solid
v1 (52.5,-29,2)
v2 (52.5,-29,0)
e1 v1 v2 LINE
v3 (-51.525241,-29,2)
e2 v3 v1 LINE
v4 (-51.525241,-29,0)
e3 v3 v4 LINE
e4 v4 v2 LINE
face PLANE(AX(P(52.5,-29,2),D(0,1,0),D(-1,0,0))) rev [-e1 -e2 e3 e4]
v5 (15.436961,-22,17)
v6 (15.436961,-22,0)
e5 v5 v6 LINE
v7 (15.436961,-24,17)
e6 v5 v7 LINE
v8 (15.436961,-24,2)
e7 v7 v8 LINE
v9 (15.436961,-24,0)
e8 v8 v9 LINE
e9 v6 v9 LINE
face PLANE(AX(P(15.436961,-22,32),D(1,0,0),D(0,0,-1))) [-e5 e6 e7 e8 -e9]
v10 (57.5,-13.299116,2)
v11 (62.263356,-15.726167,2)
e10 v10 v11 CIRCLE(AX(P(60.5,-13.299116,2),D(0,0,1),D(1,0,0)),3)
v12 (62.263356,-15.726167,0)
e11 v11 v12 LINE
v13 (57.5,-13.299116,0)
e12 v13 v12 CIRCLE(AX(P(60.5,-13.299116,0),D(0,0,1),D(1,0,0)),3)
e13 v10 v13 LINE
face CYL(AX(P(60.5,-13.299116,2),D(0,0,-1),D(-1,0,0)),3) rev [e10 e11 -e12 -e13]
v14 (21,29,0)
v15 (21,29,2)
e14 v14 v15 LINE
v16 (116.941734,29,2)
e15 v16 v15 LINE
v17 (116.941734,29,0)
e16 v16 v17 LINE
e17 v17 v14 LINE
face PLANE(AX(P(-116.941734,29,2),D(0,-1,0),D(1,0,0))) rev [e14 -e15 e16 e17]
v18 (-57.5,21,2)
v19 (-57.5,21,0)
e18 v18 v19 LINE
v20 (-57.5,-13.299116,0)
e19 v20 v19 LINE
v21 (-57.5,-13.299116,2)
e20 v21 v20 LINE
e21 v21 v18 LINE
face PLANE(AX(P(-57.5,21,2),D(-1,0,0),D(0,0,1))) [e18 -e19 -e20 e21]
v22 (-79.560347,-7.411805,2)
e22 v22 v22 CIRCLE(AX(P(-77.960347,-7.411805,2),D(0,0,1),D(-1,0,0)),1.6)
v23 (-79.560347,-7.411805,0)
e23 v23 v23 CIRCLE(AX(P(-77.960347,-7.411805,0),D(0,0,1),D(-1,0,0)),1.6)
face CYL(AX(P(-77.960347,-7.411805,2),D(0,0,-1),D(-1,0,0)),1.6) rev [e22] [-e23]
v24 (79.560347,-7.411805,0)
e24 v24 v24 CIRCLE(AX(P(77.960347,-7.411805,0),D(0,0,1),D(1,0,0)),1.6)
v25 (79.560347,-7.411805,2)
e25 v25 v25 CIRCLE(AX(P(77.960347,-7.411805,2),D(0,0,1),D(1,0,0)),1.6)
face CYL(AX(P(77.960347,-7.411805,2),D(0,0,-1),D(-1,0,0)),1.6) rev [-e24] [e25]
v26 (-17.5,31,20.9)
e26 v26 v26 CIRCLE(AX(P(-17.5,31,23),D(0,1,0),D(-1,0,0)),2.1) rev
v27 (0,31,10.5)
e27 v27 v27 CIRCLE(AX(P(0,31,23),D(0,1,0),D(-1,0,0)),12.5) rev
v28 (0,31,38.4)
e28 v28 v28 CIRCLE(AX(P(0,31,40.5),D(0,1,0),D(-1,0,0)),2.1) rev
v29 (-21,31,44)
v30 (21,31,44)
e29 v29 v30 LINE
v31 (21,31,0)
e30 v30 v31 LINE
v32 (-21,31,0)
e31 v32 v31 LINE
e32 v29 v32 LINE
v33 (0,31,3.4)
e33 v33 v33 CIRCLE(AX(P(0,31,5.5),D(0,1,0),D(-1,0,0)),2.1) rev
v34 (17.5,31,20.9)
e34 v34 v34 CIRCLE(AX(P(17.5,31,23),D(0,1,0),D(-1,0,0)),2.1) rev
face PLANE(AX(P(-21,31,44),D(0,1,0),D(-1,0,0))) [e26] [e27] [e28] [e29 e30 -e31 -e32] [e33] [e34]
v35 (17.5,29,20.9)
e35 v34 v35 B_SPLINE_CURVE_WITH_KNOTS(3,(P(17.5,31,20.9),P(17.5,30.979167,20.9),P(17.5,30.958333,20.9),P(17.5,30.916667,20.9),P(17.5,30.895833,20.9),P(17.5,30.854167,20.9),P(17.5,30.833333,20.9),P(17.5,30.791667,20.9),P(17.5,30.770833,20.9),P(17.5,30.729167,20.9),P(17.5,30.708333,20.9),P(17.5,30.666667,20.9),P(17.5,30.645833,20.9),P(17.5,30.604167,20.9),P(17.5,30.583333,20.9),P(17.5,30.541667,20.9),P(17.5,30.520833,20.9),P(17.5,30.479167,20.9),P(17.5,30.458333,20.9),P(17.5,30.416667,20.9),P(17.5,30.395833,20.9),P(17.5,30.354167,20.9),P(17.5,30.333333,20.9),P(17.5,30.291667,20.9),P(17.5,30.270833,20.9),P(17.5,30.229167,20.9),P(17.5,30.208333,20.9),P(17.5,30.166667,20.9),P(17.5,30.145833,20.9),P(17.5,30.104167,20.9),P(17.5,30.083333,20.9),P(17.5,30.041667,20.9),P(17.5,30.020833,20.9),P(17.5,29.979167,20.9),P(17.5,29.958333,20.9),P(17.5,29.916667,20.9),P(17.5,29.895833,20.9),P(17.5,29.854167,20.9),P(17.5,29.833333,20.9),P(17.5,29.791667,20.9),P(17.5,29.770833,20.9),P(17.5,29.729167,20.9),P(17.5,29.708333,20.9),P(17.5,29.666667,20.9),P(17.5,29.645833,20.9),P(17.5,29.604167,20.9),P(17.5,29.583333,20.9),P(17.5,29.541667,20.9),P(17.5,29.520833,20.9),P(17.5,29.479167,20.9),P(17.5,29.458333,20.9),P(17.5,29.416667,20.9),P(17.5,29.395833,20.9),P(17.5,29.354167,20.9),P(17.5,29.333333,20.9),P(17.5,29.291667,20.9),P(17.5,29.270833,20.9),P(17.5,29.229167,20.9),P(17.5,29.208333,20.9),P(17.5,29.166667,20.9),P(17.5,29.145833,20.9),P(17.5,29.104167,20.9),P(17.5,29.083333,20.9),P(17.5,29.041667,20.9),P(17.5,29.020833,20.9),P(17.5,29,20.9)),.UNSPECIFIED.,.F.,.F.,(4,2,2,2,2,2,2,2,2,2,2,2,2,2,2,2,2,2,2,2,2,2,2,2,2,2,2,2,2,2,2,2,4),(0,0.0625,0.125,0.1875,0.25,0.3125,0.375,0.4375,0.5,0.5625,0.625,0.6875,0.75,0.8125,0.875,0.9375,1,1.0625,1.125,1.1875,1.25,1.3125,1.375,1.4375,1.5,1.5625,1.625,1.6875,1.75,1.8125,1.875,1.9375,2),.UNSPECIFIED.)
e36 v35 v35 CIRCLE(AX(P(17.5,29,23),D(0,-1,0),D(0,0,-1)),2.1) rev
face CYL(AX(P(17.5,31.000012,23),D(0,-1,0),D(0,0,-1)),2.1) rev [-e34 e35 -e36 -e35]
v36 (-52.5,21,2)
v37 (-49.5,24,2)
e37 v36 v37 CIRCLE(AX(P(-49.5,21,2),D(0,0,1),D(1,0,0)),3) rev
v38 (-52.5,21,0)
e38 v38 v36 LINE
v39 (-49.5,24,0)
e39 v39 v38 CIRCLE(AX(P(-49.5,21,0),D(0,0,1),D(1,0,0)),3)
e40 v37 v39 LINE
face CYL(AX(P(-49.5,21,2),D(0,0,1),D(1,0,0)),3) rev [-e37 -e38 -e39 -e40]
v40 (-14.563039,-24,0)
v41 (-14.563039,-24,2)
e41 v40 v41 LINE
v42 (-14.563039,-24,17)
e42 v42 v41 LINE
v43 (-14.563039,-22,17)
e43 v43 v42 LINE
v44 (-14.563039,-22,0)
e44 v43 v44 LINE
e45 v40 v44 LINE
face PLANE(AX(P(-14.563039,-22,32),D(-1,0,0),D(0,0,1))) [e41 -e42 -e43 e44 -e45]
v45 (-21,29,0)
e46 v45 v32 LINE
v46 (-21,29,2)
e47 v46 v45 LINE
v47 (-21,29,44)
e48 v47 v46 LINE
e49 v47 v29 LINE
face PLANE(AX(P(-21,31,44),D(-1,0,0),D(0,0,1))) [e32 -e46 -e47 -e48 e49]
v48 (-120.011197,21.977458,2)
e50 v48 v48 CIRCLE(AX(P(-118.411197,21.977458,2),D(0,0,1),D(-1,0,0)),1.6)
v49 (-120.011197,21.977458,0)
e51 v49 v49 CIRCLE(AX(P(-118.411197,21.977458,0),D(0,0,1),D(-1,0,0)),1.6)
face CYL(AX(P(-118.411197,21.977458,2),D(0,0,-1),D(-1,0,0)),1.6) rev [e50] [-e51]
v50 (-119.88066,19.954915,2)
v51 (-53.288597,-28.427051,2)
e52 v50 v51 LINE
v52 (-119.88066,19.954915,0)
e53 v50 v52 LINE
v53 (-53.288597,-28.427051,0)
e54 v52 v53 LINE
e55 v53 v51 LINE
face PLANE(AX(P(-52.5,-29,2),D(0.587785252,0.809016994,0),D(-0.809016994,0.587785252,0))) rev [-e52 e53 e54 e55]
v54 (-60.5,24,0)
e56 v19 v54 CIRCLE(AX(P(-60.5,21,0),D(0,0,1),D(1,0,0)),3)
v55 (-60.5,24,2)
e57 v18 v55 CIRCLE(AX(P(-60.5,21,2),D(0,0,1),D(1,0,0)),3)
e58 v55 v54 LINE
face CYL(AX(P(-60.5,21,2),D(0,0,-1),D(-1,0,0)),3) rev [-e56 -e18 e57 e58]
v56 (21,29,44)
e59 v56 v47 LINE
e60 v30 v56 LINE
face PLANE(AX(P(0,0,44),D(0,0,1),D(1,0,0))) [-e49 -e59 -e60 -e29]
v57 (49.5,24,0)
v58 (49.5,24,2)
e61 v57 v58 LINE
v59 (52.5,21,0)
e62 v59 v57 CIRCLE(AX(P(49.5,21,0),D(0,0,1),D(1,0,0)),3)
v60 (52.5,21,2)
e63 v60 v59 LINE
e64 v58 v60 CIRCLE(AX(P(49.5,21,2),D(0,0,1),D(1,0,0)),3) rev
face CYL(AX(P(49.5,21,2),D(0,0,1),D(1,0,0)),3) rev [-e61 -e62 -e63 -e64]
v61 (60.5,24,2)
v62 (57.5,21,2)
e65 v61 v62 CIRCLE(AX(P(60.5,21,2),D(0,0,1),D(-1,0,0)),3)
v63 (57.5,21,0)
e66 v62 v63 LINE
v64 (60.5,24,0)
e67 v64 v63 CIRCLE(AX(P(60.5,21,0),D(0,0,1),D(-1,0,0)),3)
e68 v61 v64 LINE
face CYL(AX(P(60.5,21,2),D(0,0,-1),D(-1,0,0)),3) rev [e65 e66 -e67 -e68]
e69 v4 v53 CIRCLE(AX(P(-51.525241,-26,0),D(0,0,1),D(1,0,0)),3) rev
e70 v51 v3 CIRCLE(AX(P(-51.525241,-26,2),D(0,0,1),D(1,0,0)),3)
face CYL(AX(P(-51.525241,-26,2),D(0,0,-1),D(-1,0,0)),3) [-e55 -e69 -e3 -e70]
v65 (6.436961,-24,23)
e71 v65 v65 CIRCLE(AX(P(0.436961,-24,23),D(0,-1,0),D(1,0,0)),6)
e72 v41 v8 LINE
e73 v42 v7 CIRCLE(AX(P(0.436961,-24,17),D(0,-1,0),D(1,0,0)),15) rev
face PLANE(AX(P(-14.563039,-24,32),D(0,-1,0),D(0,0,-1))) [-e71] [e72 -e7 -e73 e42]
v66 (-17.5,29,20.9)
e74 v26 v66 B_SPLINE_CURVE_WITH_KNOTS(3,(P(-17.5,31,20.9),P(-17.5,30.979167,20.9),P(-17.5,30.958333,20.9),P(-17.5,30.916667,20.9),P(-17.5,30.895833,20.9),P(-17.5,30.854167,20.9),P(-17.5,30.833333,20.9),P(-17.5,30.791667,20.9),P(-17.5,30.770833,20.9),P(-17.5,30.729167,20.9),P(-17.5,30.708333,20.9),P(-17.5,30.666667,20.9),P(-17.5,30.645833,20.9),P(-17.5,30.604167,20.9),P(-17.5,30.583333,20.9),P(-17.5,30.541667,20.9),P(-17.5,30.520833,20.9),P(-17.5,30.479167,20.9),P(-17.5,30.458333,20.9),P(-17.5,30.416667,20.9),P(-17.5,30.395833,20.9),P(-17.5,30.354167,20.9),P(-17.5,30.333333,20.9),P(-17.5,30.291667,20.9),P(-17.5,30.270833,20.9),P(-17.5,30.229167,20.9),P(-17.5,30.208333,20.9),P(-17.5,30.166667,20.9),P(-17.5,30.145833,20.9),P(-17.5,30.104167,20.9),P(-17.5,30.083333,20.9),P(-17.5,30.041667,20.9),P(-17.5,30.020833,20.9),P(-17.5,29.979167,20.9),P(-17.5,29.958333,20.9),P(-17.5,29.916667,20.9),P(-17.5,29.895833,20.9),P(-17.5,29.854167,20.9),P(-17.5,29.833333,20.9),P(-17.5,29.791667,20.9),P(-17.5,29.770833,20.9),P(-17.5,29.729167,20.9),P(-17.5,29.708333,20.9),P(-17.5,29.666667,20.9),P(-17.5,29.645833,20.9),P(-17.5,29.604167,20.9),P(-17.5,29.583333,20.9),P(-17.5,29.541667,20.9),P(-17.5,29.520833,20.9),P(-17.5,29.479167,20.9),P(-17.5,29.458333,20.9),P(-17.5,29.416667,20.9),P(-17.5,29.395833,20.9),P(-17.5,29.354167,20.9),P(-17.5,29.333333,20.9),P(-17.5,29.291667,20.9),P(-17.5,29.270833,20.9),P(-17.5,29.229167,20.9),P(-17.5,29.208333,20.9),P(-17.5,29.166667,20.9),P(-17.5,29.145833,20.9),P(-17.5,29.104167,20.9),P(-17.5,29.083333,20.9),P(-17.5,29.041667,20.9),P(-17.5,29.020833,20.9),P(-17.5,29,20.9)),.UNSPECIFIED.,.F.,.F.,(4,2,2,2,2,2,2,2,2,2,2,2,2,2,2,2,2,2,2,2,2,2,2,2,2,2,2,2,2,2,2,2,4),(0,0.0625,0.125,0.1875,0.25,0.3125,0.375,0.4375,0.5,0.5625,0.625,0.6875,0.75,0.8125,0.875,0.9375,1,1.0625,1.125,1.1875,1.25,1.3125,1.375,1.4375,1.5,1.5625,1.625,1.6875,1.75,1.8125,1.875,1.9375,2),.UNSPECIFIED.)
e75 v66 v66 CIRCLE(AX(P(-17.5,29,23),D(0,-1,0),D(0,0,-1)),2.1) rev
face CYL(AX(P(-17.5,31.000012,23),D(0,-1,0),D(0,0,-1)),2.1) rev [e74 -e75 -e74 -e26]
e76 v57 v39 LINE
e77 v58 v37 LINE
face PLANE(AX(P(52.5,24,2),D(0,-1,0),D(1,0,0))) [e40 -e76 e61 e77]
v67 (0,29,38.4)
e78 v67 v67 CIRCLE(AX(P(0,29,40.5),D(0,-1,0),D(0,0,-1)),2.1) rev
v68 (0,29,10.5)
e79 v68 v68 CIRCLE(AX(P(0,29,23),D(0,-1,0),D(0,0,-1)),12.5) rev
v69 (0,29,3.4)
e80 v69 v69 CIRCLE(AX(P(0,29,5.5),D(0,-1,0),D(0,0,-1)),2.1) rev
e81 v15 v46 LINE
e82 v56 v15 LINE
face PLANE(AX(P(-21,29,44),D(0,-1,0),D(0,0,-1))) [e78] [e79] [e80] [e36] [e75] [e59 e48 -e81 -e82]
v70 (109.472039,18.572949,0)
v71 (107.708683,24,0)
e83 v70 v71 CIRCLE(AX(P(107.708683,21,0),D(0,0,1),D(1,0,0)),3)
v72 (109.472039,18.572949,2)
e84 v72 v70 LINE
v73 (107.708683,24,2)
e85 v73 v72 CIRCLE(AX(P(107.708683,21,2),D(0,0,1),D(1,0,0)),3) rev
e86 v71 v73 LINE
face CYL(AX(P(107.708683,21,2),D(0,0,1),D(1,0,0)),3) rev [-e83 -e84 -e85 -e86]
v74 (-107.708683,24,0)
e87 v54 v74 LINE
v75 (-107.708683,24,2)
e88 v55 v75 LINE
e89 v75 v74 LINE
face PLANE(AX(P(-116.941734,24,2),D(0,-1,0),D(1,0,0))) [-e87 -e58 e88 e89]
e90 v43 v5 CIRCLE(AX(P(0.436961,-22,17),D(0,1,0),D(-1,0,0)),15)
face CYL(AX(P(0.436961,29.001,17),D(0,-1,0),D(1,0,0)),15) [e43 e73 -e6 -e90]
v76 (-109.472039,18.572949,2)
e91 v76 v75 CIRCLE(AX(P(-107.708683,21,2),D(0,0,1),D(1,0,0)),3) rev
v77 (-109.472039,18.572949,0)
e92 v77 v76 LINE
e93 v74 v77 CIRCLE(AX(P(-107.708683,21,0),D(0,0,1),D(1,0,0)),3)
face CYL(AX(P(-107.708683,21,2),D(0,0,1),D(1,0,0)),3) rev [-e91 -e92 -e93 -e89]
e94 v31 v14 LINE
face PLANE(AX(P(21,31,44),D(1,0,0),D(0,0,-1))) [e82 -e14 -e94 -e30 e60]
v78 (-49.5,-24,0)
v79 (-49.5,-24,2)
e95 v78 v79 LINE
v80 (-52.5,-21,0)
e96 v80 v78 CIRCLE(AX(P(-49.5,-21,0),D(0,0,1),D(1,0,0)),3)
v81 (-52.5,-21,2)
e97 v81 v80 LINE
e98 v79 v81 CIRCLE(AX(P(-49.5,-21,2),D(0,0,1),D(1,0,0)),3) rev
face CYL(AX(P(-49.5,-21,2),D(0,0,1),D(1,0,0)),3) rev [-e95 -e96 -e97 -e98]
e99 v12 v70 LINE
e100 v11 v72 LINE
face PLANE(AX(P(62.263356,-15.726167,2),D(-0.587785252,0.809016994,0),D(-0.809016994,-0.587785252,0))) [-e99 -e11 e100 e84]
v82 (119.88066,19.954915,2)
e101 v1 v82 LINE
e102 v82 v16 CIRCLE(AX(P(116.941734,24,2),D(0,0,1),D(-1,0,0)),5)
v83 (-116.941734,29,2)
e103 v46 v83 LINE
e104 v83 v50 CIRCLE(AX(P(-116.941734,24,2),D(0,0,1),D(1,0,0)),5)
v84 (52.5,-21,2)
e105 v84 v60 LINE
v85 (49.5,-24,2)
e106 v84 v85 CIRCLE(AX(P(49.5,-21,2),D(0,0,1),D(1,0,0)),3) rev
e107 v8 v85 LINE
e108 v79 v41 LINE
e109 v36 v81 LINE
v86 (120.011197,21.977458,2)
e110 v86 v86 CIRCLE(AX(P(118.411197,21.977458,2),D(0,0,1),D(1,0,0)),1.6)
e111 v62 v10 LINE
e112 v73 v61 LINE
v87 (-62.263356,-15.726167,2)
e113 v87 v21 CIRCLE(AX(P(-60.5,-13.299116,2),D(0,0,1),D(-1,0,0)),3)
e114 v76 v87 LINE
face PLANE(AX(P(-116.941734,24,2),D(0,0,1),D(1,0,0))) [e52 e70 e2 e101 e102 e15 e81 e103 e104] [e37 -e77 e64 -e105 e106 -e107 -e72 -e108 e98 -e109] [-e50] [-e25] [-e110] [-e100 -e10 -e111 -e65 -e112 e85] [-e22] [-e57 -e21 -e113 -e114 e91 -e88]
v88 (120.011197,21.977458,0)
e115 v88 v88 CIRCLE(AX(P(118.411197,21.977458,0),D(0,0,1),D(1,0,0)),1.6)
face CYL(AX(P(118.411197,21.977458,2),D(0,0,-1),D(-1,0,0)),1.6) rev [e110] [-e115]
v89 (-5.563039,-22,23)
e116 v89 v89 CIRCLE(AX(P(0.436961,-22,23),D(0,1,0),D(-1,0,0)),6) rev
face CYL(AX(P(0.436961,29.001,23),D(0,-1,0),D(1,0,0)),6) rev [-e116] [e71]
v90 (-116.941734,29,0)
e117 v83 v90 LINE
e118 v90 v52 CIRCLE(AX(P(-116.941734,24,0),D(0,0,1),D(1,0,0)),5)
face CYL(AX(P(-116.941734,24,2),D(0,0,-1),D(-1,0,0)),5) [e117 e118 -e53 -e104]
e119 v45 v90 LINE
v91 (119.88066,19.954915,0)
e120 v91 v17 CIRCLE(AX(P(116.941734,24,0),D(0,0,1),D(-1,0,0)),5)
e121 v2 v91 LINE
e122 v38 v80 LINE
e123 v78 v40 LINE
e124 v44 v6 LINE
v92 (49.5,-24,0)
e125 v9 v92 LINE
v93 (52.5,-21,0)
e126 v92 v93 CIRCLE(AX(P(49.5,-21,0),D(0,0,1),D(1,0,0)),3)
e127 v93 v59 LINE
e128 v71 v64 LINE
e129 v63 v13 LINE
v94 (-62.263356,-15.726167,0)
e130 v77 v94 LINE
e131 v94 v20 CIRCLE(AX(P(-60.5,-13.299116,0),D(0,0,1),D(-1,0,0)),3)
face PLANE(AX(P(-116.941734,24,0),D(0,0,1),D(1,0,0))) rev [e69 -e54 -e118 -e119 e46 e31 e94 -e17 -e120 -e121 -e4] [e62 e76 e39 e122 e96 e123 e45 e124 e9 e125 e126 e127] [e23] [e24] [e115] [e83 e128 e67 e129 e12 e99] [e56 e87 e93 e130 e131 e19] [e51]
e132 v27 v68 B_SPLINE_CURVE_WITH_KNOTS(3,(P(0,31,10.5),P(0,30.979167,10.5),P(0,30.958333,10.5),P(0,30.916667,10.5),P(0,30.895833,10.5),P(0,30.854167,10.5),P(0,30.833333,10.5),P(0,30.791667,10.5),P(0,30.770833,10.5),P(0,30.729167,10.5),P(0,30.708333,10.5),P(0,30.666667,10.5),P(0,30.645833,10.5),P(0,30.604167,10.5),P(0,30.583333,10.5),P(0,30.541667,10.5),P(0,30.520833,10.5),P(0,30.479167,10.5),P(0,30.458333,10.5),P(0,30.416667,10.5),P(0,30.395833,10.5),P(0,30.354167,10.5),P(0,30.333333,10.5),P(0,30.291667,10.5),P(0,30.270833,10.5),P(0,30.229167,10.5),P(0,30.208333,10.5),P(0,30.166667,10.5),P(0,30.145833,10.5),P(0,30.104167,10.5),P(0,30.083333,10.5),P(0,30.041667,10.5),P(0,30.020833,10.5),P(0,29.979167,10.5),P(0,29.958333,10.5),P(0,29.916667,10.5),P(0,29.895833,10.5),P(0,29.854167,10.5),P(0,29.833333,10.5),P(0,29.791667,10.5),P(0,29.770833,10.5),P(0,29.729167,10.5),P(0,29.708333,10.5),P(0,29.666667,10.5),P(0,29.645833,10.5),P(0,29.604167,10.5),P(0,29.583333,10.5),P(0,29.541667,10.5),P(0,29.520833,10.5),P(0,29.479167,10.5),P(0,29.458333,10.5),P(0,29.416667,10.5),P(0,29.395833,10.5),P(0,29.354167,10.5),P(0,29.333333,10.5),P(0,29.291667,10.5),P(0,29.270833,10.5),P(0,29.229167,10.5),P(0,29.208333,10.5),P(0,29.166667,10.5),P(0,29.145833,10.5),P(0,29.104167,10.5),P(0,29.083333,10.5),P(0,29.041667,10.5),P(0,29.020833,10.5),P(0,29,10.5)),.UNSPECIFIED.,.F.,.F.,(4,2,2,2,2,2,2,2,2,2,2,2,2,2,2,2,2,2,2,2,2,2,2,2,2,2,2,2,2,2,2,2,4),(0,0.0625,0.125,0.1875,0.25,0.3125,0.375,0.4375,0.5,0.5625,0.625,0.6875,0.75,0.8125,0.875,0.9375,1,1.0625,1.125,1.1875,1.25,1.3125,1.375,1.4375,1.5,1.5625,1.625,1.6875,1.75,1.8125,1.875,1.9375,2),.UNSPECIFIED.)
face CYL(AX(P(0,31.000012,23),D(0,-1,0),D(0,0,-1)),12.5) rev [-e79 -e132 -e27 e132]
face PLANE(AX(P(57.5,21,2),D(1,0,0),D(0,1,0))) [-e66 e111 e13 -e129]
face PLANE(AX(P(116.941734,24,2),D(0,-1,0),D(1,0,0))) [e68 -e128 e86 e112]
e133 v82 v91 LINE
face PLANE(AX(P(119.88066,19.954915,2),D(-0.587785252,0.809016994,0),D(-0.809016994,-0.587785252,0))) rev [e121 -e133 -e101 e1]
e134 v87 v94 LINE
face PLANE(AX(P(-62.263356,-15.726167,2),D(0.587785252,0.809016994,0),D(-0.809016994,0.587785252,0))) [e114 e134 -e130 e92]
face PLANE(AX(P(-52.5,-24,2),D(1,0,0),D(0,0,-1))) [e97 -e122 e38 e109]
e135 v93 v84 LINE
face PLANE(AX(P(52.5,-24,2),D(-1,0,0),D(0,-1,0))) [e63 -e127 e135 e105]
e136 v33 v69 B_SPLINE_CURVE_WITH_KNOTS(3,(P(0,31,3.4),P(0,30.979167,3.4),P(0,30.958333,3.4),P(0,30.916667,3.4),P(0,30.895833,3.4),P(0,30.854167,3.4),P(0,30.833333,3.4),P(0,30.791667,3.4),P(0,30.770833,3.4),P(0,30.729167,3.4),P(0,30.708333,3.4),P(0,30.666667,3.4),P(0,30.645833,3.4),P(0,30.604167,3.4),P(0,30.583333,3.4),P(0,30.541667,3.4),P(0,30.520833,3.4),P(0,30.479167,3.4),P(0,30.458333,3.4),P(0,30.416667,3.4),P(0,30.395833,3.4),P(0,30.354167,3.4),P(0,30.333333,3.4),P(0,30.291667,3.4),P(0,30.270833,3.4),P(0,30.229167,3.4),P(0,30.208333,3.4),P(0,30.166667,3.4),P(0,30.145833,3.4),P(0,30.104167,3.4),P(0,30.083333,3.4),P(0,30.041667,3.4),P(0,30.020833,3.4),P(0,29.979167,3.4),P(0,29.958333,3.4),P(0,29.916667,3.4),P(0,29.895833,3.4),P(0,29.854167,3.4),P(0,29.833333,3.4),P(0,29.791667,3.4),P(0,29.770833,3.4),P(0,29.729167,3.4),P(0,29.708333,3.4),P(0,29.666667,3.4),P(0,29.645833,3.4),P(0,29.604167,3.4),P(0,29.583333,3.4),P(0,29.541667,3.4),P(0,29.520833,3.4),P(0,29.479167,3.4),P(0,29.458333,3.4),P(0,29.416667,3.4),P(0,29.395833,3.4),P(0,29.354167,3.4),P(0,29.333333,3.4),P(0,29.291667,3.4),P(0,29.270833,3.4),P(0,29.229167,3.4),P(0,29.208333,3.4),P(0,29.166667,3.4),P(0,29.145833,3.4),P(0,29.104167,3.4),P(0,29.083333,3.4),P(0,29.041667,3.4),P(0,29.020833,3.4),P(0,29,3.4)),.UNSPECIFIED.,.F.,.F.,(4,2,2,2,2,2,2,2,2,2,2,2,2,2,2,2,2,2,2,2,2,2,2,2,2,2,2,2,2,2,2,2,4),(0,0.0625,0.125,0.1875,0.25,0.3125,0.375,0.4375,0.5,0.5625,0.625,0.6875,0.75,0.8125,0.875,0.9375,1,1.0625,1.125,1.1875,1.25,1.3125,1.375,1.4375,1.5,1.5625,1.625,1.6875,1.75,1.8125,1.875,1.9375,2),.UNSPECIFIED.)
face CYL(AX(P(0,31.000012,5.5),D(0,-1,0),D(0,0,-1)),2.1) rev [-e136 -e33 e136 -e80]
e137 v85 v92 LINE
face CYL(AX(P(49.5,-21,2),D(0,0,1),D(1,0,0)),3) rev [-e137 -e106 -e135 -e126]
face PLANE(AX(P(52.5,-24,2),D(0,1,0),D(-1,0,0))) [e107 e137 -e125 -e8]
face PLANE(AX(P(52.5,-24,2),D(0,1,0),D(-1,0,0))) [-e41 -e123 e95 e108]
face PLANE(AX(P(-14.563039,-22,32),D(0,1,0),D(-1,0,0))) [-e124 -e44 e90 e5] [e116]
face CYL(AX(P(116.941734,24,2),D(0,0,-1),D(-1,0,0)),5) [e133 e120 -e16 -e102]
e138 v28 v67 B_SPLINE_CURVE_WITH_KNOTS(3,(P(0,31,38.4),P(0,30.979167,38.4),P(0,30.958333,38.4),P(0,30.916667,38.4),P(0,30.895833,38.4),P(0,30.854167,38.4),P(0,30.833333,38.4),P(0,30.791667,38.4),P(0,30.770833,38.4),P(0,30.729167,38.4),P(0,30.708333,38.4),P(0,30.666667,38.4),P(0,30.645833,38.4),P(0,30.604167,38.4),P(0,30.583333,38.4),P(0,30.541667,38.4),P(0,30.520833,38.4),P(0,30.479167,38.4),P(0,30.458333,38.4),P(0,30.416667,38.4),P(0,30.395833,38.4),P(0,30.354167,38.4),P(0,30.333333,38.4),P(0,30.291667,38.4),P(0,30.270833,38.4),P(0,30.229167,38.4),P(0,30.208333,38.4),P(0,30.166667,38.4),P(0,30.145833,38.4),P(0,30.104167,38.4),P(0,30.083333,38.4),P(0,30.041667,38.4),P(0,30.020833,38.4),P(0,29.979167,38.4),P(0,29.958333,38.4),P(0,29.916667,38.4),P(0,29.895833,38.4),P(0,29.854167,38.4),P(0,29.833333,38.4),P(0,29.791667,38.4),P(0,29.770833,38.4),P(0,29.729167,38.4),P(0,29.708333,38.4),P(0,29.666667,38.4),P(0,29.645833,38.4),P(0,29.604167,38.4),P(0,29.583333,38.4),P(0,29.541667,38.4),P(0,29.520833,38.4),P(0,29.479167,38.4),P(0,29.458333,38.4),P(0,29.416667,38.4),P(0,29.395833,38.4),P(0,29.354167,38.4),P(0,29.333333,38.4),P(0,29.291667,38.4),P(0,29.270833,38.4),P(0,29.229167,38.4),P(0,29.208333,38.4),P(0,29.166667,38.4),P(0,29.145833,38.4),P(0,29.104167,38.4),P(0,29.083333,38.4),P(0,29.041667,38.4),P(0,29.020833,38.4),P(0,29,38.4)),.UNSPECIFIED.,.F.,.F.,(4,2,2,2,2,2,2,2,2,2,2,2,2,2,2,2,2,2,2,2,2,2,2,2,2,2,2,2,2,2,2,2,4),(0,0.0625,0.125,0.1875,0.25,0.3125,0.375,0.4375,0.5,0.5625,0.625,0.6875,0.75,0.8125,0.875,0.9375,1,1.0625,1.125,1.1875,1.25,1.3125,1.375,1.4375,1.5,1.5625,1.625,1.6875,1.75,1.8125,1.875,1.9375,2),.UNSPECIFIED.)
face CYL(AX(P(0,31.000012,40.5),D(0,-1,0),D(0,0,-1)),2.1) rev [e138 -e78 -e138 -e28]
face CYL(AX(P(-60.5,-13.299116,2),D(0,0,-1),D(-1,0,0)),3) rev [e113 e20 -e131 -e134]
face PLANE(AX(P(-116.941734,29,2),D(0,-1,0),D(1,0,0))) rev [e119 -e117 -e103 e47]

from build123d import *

# Parameters (mm, degrees)
SKETCH_1_R                      = 1.6
SKETCH_1_W                      = 105
SKETCH_1_H                      = 48
EXTRUDE_1_DEPTH                 = 2
FILLET_1_R                      = 3
SKETCH_2_W                      = 30
SKETCH_2_H                      = 2
EXTRUDE_2_DEPTH                 = 32
CUT_EXTRUDE_START               = -2
CUT_EXTRUDE_1_OUTLINE_R         = 6
CUT_EXTRUDE_1_DEPTH             = 2
SKETCH_4_W                      = 42
SKETCH_4_H                      = 2
EXTRUDE_3_DEPTH                 = 44
CUT_EXTRUDE_2_REACH             = 144.849
SKETCH_5_R                      = 2.1
SKETCH_5_R_2                    = 12.5
CUT_EXTRUDE_2_DIRECTION_2_DEPTH = 143.84882365


# Read off the part's stored shape, not the designer's step: ｶｯﾄ - 押し出し1
with BuildPart() as part:
    # ｽｹｯﾁ1 → ﾎﾞｽ - 押し出し1 (new body)
    with BuildSketch(Plane.XY):
        with BuildLine():
            Line((-116.941733701, 29), (116.941733701, 29))
            ThreePointArc((116.941733701, 29), (121.697016283, 25.545084972), (119.880659963, 19.954915028))
            Line((119.880659963, 19.954915028), (52.5, -29))
            Line((52.5, -29), (-52.5, -29))
            Line((-52.5, -29), (-119.880659963, 19.954915028))
            ThreePointArc((-119.880659963, 19.954915028), (-121.697016283, 25.545084972), (-116.941733701, 29))
        make_face()
        with Locations((118.411196832, 21.977457514)):
            Circle(SKETCH_1_R, mode=Mode.SUBTRACT)
        with Locations((77.960347113, -7.411805101)):
            Circle(SKETCH_1_R, mode=Mode.SUBTRACT)
        with Locations(Location((-118.411196832, 21.977457514, 0), (0, 0, 180))):
            Circle(SKETCH_1_R, mode=Mode.SUBTRACT)
        with Locations(Location((-77.960347113, -7.411805101, 0), (0, 0, 180))):
            Circle(SKETCH_1_R, mode=Mode.SUBTRACT)
        Rectangle(SKETCH_1_W, SKETCH_1_H, mode=Mode.SUBTRACT)
        with BuildLine():
            Line((-57.5, 21), (-57.5, -13.299115956))
            ThreePointArc((-57.5, -13.299115956), (-59.138028501, -15.972135529), (-62.263355757, -15.726166939))
            Line((-62.263355757, -15.726166939), (-116.941733701, 24))
            Line((-116.941733701, 24), (-60.5, 24))
            ThreePointArc((-60.5, 24), (-58.378679656, 23.121320344), (-57.5, 21))
        make_face(mode=Mode.SUBTRACT)
        with BuildLine():
            Line((62.263355757, -15.726166939), (116.941733701, 24))
            Line((116.941733701, 24), (60.5, 24))
            ThreePointArc((60.5, 24), (58.378679656, 23.121320344), (57.5, 21))
            Line((57.5, 21), (57.5, -13.299115956))
            ThreePointArc((57.5, -13.299115956), (59.138028501, -15.972135529), (62.263355757, -15.726166939))
        make_face(mode=Mode.SUBTRACT)
    extrude(amount=EXTRUDE_1_DEPTH)

    # ﾌｨﾚｯﾄ1
    fillet_1_edges = [part.edges().sort_by_distance(p)[0] for p in [
        (-52.5, -29, 1),
        (-52.5, 24, 1),
        (-52.5, -24, 1),
        (52.5, -24, 1),
        (52.5, 24, 1),
        (116.941733701, 24, 1),
        (-116.941733701, 24, 1),
    ]]
    fillet(fillet_1_edges, radius=FILLET_1_R)

    # ｽｹｯﾁ2 → ﾎﾞｽ - 押し出し2 (add)
    with BuildSketch(Plane(origin=(0, 0, 0), x_dir=(-1, 0, 0), z_dir=(0, 0, -1))):
        with Locations((-0.436960971, -23)):
            Rectangle(SKETCH_2_W, SKETCH_2_H)
    extrude(amount=-EXTRUDE_2_DEPTH)

    # ｶｯﾄ - 押し出し1 outline → ｶｯﾄ - 押し出し1 (cut)
    with BuildSketch(Plane.XZ.offset(24).offset(CUT_EXTRUDE_START)):
        with BuildLine():
            ThreePointArc((-14.563039029, 17), (-10.169640747, 27.606601718), (0.436960971, 32))
            Line((0.436960971, 32), (-14.563039029, 32))
            Line((-14.563039029, 32), (-14.563039029, 17))
        make_face()
        with BuildLine():
            ThreePointArc((0.436960971, 32), (11.043562689, 27.606601718), (15.436960971, 17))
            Line((15.436960971, 17), (15.436960971, 32))
            Line((15.436960971, 32), (0.436960971, 32))
        make_face()
        with Locations((0.436960971, 23)):
            Circle(CUT_EXTRUDE_1_OUTLINE_R)
    extrude(amount=CUT_EXTRUDE_1_DEPTH, mode=Mode.SUBTRACT)

    # ｽｹｯﾁ4 → ﾎﾞｽ - 押し出し3 (add)
    with BuildSketch(Plane(origin=(0, 0, 0), x_dir=(-1, 0, 0), z_dir=(0, 0, -1))):
        with Locations((0, 30)):
            Rectangle(SKETCH_4_W, SKETCH_4_H)
    extrude(amount=-EXTRUDE_3_DEPTH)

    # ｽｹｯﾁ5 → ｶｯﾄ - 押し出し2 (cut, up to next)
    with BuildSketch(Plane(origin=(0, 31, 0), x_dir=(1, 0, 0), z_dir=(0, 1, 0)), mode=Mode.PRIVATE) as cut_extrude_2_sk1:
        with Locations(Location((0, -5.5, 0), (0, 0, 90))):
            Circle(SKETCH_5_R)
    cut_extrude_2_tool1 = extrude(cut_extrude_2_sk1.sketch, amount=-CUT_EXTRUDE_2_REACH, mode=Mode.PRIVATE) & part.part
    # ｽｹｯﾁ5 → ｶｯﾄ - 押し出し2 (cut, up to next)
    with BuildSketch(Plane(origin=(0, 31, 0), x_dir=(1, 0, 0), z_dir=(0, 1, 0)), mode=Mode.PRIVATE) as cut_extrude_2_sk2:
        with Locations(Location((-17.5, -23, 0), (0, 0, 90))):
            Circle(SKETCH_5_R)
    cut_extrude_2_tool2 = extrude(cut_extrude_2_sk2.sketch, amount=-CUT_EXTRUDE_2_REACH, mode=Mode.PRIVATE) & part.part
    # ｽｹｯﾁ5 → ｶｯﾄ - 押し出し2 (cut, up to next)
    with BuildSketch(Plane(origin=(0, 31, 0), x_dir=(1, 0, 0), z_dir=(0, 1, 0)), mode=Mode.PRIVATE) as cut_extrude_2_sk3:
        with Locations(Location((0, -40.5, 0), (0, 0, 90))):
            Circle(SKETCH_5_R)
    cut_extrude_2_tool3 = extrude(cut_extrude_2_sk3.sketch, amount=-CUT_EXTRUDE_2_REACH, mode=Mode.PRIVATE) & part.part
    # ｽｹｯﾁ5 → ｶｯﾄ - 押し出し2 (cut, up to next)
    with BuildSketch(Plane(origin=(0, 31, 0), x_dir=(1, 0, 0), z_dir=(0, 1, 0)), mode=Mode.PRIVATE) as cut_extrude_2_sk4:
        with Locations(Location((17.5, -23, 0), (0, 0, 90))):
            Circle(SKETCH_5_R)
    cut_extrude_2_tool4 = extrude(cut_extrude_2_sk4.sketch, amount=-CUT_EXTRUDE_2_REACH, mode=Mode.PRIVATE) & part.part
    # ｽｹｯﾁ5 → ｶｯﾄ - 押し出し2 (cut, up to next)
    with BuildSketch(Plane(origin=(0, 31, 0), x_dir=(1, 0, 0), z_dir=(0, 1, 0)), mode=Mode.PRIVATE) as cut_extrude_2_sk5:
        with Locations(Location((0, -23, 0), (0, 0, 90))):
            Circle(SKETCH_5_R_2)
    cut_extrude_2_tool5 = extrude(cut_extrude_2_sk5.sketch, amount=-CUT_EXTRUDE_2_REACH, mode=Mode.PRIVATE) & part.part
    add(cut_extrude_2_tool1.solids().sort_by_distance((0, 31, 5.5))[0], mode=Mode.SUBTRACT)
    add(cut_extrude_2_tool2.solids().sort_by_distance((-17.5, 31, 23))[0], mode=Mode.SUBTRACT)
    add(cut_extrude_2_tool3.solids().sort_by_distance((0, 31, 40.5))[0], mode=Mode.SUBTRACT)
    add(cut_extrude_2_tool4.solids().sort_by_distance((17.5, 31, 23))[0], mode=Mode.SUBTRACT)
    add(cut_extrude_2_tool5.solids().sort_by_distance((0, 31, 23))[0], mode=Mode.SUBTRACT)

    # ｽｹｯﾁ5 → ｶｯﾄ - 押し出し2 direction 2 (cut)
    with BuildSketch(Plane(origin=(0, 31, 0), x_dir=(1, 0, 0), z_dir=(0, 1, 0))):
        with Locations(Location((0, -5.5, 0), (0, 0, 90))):
            Circle(SKETCH_5_R)
        with Locations(Location((-17.5, -23, 0), (0, 0, 90))):
            Circle(SKETCH_5_R)
        with Locations(Location((0, -40.5, 0), (0, 0, 90))):
            Circle(SKETCH_5_R)
        with Locations(Location((17.5, -23, 0), (0, 0, 90))):
            Circle(SKETCH_5_R)
        with Locations(Location((0, -23, 0), (0, 0, 90))):
            Circle(SKETCH_5_R_2)
    extrude(amount=CUT_EXTRUDE_2_DIRECTION_2_DEPTH, mode=Mode.SUBTRACT)


solid = part.part
